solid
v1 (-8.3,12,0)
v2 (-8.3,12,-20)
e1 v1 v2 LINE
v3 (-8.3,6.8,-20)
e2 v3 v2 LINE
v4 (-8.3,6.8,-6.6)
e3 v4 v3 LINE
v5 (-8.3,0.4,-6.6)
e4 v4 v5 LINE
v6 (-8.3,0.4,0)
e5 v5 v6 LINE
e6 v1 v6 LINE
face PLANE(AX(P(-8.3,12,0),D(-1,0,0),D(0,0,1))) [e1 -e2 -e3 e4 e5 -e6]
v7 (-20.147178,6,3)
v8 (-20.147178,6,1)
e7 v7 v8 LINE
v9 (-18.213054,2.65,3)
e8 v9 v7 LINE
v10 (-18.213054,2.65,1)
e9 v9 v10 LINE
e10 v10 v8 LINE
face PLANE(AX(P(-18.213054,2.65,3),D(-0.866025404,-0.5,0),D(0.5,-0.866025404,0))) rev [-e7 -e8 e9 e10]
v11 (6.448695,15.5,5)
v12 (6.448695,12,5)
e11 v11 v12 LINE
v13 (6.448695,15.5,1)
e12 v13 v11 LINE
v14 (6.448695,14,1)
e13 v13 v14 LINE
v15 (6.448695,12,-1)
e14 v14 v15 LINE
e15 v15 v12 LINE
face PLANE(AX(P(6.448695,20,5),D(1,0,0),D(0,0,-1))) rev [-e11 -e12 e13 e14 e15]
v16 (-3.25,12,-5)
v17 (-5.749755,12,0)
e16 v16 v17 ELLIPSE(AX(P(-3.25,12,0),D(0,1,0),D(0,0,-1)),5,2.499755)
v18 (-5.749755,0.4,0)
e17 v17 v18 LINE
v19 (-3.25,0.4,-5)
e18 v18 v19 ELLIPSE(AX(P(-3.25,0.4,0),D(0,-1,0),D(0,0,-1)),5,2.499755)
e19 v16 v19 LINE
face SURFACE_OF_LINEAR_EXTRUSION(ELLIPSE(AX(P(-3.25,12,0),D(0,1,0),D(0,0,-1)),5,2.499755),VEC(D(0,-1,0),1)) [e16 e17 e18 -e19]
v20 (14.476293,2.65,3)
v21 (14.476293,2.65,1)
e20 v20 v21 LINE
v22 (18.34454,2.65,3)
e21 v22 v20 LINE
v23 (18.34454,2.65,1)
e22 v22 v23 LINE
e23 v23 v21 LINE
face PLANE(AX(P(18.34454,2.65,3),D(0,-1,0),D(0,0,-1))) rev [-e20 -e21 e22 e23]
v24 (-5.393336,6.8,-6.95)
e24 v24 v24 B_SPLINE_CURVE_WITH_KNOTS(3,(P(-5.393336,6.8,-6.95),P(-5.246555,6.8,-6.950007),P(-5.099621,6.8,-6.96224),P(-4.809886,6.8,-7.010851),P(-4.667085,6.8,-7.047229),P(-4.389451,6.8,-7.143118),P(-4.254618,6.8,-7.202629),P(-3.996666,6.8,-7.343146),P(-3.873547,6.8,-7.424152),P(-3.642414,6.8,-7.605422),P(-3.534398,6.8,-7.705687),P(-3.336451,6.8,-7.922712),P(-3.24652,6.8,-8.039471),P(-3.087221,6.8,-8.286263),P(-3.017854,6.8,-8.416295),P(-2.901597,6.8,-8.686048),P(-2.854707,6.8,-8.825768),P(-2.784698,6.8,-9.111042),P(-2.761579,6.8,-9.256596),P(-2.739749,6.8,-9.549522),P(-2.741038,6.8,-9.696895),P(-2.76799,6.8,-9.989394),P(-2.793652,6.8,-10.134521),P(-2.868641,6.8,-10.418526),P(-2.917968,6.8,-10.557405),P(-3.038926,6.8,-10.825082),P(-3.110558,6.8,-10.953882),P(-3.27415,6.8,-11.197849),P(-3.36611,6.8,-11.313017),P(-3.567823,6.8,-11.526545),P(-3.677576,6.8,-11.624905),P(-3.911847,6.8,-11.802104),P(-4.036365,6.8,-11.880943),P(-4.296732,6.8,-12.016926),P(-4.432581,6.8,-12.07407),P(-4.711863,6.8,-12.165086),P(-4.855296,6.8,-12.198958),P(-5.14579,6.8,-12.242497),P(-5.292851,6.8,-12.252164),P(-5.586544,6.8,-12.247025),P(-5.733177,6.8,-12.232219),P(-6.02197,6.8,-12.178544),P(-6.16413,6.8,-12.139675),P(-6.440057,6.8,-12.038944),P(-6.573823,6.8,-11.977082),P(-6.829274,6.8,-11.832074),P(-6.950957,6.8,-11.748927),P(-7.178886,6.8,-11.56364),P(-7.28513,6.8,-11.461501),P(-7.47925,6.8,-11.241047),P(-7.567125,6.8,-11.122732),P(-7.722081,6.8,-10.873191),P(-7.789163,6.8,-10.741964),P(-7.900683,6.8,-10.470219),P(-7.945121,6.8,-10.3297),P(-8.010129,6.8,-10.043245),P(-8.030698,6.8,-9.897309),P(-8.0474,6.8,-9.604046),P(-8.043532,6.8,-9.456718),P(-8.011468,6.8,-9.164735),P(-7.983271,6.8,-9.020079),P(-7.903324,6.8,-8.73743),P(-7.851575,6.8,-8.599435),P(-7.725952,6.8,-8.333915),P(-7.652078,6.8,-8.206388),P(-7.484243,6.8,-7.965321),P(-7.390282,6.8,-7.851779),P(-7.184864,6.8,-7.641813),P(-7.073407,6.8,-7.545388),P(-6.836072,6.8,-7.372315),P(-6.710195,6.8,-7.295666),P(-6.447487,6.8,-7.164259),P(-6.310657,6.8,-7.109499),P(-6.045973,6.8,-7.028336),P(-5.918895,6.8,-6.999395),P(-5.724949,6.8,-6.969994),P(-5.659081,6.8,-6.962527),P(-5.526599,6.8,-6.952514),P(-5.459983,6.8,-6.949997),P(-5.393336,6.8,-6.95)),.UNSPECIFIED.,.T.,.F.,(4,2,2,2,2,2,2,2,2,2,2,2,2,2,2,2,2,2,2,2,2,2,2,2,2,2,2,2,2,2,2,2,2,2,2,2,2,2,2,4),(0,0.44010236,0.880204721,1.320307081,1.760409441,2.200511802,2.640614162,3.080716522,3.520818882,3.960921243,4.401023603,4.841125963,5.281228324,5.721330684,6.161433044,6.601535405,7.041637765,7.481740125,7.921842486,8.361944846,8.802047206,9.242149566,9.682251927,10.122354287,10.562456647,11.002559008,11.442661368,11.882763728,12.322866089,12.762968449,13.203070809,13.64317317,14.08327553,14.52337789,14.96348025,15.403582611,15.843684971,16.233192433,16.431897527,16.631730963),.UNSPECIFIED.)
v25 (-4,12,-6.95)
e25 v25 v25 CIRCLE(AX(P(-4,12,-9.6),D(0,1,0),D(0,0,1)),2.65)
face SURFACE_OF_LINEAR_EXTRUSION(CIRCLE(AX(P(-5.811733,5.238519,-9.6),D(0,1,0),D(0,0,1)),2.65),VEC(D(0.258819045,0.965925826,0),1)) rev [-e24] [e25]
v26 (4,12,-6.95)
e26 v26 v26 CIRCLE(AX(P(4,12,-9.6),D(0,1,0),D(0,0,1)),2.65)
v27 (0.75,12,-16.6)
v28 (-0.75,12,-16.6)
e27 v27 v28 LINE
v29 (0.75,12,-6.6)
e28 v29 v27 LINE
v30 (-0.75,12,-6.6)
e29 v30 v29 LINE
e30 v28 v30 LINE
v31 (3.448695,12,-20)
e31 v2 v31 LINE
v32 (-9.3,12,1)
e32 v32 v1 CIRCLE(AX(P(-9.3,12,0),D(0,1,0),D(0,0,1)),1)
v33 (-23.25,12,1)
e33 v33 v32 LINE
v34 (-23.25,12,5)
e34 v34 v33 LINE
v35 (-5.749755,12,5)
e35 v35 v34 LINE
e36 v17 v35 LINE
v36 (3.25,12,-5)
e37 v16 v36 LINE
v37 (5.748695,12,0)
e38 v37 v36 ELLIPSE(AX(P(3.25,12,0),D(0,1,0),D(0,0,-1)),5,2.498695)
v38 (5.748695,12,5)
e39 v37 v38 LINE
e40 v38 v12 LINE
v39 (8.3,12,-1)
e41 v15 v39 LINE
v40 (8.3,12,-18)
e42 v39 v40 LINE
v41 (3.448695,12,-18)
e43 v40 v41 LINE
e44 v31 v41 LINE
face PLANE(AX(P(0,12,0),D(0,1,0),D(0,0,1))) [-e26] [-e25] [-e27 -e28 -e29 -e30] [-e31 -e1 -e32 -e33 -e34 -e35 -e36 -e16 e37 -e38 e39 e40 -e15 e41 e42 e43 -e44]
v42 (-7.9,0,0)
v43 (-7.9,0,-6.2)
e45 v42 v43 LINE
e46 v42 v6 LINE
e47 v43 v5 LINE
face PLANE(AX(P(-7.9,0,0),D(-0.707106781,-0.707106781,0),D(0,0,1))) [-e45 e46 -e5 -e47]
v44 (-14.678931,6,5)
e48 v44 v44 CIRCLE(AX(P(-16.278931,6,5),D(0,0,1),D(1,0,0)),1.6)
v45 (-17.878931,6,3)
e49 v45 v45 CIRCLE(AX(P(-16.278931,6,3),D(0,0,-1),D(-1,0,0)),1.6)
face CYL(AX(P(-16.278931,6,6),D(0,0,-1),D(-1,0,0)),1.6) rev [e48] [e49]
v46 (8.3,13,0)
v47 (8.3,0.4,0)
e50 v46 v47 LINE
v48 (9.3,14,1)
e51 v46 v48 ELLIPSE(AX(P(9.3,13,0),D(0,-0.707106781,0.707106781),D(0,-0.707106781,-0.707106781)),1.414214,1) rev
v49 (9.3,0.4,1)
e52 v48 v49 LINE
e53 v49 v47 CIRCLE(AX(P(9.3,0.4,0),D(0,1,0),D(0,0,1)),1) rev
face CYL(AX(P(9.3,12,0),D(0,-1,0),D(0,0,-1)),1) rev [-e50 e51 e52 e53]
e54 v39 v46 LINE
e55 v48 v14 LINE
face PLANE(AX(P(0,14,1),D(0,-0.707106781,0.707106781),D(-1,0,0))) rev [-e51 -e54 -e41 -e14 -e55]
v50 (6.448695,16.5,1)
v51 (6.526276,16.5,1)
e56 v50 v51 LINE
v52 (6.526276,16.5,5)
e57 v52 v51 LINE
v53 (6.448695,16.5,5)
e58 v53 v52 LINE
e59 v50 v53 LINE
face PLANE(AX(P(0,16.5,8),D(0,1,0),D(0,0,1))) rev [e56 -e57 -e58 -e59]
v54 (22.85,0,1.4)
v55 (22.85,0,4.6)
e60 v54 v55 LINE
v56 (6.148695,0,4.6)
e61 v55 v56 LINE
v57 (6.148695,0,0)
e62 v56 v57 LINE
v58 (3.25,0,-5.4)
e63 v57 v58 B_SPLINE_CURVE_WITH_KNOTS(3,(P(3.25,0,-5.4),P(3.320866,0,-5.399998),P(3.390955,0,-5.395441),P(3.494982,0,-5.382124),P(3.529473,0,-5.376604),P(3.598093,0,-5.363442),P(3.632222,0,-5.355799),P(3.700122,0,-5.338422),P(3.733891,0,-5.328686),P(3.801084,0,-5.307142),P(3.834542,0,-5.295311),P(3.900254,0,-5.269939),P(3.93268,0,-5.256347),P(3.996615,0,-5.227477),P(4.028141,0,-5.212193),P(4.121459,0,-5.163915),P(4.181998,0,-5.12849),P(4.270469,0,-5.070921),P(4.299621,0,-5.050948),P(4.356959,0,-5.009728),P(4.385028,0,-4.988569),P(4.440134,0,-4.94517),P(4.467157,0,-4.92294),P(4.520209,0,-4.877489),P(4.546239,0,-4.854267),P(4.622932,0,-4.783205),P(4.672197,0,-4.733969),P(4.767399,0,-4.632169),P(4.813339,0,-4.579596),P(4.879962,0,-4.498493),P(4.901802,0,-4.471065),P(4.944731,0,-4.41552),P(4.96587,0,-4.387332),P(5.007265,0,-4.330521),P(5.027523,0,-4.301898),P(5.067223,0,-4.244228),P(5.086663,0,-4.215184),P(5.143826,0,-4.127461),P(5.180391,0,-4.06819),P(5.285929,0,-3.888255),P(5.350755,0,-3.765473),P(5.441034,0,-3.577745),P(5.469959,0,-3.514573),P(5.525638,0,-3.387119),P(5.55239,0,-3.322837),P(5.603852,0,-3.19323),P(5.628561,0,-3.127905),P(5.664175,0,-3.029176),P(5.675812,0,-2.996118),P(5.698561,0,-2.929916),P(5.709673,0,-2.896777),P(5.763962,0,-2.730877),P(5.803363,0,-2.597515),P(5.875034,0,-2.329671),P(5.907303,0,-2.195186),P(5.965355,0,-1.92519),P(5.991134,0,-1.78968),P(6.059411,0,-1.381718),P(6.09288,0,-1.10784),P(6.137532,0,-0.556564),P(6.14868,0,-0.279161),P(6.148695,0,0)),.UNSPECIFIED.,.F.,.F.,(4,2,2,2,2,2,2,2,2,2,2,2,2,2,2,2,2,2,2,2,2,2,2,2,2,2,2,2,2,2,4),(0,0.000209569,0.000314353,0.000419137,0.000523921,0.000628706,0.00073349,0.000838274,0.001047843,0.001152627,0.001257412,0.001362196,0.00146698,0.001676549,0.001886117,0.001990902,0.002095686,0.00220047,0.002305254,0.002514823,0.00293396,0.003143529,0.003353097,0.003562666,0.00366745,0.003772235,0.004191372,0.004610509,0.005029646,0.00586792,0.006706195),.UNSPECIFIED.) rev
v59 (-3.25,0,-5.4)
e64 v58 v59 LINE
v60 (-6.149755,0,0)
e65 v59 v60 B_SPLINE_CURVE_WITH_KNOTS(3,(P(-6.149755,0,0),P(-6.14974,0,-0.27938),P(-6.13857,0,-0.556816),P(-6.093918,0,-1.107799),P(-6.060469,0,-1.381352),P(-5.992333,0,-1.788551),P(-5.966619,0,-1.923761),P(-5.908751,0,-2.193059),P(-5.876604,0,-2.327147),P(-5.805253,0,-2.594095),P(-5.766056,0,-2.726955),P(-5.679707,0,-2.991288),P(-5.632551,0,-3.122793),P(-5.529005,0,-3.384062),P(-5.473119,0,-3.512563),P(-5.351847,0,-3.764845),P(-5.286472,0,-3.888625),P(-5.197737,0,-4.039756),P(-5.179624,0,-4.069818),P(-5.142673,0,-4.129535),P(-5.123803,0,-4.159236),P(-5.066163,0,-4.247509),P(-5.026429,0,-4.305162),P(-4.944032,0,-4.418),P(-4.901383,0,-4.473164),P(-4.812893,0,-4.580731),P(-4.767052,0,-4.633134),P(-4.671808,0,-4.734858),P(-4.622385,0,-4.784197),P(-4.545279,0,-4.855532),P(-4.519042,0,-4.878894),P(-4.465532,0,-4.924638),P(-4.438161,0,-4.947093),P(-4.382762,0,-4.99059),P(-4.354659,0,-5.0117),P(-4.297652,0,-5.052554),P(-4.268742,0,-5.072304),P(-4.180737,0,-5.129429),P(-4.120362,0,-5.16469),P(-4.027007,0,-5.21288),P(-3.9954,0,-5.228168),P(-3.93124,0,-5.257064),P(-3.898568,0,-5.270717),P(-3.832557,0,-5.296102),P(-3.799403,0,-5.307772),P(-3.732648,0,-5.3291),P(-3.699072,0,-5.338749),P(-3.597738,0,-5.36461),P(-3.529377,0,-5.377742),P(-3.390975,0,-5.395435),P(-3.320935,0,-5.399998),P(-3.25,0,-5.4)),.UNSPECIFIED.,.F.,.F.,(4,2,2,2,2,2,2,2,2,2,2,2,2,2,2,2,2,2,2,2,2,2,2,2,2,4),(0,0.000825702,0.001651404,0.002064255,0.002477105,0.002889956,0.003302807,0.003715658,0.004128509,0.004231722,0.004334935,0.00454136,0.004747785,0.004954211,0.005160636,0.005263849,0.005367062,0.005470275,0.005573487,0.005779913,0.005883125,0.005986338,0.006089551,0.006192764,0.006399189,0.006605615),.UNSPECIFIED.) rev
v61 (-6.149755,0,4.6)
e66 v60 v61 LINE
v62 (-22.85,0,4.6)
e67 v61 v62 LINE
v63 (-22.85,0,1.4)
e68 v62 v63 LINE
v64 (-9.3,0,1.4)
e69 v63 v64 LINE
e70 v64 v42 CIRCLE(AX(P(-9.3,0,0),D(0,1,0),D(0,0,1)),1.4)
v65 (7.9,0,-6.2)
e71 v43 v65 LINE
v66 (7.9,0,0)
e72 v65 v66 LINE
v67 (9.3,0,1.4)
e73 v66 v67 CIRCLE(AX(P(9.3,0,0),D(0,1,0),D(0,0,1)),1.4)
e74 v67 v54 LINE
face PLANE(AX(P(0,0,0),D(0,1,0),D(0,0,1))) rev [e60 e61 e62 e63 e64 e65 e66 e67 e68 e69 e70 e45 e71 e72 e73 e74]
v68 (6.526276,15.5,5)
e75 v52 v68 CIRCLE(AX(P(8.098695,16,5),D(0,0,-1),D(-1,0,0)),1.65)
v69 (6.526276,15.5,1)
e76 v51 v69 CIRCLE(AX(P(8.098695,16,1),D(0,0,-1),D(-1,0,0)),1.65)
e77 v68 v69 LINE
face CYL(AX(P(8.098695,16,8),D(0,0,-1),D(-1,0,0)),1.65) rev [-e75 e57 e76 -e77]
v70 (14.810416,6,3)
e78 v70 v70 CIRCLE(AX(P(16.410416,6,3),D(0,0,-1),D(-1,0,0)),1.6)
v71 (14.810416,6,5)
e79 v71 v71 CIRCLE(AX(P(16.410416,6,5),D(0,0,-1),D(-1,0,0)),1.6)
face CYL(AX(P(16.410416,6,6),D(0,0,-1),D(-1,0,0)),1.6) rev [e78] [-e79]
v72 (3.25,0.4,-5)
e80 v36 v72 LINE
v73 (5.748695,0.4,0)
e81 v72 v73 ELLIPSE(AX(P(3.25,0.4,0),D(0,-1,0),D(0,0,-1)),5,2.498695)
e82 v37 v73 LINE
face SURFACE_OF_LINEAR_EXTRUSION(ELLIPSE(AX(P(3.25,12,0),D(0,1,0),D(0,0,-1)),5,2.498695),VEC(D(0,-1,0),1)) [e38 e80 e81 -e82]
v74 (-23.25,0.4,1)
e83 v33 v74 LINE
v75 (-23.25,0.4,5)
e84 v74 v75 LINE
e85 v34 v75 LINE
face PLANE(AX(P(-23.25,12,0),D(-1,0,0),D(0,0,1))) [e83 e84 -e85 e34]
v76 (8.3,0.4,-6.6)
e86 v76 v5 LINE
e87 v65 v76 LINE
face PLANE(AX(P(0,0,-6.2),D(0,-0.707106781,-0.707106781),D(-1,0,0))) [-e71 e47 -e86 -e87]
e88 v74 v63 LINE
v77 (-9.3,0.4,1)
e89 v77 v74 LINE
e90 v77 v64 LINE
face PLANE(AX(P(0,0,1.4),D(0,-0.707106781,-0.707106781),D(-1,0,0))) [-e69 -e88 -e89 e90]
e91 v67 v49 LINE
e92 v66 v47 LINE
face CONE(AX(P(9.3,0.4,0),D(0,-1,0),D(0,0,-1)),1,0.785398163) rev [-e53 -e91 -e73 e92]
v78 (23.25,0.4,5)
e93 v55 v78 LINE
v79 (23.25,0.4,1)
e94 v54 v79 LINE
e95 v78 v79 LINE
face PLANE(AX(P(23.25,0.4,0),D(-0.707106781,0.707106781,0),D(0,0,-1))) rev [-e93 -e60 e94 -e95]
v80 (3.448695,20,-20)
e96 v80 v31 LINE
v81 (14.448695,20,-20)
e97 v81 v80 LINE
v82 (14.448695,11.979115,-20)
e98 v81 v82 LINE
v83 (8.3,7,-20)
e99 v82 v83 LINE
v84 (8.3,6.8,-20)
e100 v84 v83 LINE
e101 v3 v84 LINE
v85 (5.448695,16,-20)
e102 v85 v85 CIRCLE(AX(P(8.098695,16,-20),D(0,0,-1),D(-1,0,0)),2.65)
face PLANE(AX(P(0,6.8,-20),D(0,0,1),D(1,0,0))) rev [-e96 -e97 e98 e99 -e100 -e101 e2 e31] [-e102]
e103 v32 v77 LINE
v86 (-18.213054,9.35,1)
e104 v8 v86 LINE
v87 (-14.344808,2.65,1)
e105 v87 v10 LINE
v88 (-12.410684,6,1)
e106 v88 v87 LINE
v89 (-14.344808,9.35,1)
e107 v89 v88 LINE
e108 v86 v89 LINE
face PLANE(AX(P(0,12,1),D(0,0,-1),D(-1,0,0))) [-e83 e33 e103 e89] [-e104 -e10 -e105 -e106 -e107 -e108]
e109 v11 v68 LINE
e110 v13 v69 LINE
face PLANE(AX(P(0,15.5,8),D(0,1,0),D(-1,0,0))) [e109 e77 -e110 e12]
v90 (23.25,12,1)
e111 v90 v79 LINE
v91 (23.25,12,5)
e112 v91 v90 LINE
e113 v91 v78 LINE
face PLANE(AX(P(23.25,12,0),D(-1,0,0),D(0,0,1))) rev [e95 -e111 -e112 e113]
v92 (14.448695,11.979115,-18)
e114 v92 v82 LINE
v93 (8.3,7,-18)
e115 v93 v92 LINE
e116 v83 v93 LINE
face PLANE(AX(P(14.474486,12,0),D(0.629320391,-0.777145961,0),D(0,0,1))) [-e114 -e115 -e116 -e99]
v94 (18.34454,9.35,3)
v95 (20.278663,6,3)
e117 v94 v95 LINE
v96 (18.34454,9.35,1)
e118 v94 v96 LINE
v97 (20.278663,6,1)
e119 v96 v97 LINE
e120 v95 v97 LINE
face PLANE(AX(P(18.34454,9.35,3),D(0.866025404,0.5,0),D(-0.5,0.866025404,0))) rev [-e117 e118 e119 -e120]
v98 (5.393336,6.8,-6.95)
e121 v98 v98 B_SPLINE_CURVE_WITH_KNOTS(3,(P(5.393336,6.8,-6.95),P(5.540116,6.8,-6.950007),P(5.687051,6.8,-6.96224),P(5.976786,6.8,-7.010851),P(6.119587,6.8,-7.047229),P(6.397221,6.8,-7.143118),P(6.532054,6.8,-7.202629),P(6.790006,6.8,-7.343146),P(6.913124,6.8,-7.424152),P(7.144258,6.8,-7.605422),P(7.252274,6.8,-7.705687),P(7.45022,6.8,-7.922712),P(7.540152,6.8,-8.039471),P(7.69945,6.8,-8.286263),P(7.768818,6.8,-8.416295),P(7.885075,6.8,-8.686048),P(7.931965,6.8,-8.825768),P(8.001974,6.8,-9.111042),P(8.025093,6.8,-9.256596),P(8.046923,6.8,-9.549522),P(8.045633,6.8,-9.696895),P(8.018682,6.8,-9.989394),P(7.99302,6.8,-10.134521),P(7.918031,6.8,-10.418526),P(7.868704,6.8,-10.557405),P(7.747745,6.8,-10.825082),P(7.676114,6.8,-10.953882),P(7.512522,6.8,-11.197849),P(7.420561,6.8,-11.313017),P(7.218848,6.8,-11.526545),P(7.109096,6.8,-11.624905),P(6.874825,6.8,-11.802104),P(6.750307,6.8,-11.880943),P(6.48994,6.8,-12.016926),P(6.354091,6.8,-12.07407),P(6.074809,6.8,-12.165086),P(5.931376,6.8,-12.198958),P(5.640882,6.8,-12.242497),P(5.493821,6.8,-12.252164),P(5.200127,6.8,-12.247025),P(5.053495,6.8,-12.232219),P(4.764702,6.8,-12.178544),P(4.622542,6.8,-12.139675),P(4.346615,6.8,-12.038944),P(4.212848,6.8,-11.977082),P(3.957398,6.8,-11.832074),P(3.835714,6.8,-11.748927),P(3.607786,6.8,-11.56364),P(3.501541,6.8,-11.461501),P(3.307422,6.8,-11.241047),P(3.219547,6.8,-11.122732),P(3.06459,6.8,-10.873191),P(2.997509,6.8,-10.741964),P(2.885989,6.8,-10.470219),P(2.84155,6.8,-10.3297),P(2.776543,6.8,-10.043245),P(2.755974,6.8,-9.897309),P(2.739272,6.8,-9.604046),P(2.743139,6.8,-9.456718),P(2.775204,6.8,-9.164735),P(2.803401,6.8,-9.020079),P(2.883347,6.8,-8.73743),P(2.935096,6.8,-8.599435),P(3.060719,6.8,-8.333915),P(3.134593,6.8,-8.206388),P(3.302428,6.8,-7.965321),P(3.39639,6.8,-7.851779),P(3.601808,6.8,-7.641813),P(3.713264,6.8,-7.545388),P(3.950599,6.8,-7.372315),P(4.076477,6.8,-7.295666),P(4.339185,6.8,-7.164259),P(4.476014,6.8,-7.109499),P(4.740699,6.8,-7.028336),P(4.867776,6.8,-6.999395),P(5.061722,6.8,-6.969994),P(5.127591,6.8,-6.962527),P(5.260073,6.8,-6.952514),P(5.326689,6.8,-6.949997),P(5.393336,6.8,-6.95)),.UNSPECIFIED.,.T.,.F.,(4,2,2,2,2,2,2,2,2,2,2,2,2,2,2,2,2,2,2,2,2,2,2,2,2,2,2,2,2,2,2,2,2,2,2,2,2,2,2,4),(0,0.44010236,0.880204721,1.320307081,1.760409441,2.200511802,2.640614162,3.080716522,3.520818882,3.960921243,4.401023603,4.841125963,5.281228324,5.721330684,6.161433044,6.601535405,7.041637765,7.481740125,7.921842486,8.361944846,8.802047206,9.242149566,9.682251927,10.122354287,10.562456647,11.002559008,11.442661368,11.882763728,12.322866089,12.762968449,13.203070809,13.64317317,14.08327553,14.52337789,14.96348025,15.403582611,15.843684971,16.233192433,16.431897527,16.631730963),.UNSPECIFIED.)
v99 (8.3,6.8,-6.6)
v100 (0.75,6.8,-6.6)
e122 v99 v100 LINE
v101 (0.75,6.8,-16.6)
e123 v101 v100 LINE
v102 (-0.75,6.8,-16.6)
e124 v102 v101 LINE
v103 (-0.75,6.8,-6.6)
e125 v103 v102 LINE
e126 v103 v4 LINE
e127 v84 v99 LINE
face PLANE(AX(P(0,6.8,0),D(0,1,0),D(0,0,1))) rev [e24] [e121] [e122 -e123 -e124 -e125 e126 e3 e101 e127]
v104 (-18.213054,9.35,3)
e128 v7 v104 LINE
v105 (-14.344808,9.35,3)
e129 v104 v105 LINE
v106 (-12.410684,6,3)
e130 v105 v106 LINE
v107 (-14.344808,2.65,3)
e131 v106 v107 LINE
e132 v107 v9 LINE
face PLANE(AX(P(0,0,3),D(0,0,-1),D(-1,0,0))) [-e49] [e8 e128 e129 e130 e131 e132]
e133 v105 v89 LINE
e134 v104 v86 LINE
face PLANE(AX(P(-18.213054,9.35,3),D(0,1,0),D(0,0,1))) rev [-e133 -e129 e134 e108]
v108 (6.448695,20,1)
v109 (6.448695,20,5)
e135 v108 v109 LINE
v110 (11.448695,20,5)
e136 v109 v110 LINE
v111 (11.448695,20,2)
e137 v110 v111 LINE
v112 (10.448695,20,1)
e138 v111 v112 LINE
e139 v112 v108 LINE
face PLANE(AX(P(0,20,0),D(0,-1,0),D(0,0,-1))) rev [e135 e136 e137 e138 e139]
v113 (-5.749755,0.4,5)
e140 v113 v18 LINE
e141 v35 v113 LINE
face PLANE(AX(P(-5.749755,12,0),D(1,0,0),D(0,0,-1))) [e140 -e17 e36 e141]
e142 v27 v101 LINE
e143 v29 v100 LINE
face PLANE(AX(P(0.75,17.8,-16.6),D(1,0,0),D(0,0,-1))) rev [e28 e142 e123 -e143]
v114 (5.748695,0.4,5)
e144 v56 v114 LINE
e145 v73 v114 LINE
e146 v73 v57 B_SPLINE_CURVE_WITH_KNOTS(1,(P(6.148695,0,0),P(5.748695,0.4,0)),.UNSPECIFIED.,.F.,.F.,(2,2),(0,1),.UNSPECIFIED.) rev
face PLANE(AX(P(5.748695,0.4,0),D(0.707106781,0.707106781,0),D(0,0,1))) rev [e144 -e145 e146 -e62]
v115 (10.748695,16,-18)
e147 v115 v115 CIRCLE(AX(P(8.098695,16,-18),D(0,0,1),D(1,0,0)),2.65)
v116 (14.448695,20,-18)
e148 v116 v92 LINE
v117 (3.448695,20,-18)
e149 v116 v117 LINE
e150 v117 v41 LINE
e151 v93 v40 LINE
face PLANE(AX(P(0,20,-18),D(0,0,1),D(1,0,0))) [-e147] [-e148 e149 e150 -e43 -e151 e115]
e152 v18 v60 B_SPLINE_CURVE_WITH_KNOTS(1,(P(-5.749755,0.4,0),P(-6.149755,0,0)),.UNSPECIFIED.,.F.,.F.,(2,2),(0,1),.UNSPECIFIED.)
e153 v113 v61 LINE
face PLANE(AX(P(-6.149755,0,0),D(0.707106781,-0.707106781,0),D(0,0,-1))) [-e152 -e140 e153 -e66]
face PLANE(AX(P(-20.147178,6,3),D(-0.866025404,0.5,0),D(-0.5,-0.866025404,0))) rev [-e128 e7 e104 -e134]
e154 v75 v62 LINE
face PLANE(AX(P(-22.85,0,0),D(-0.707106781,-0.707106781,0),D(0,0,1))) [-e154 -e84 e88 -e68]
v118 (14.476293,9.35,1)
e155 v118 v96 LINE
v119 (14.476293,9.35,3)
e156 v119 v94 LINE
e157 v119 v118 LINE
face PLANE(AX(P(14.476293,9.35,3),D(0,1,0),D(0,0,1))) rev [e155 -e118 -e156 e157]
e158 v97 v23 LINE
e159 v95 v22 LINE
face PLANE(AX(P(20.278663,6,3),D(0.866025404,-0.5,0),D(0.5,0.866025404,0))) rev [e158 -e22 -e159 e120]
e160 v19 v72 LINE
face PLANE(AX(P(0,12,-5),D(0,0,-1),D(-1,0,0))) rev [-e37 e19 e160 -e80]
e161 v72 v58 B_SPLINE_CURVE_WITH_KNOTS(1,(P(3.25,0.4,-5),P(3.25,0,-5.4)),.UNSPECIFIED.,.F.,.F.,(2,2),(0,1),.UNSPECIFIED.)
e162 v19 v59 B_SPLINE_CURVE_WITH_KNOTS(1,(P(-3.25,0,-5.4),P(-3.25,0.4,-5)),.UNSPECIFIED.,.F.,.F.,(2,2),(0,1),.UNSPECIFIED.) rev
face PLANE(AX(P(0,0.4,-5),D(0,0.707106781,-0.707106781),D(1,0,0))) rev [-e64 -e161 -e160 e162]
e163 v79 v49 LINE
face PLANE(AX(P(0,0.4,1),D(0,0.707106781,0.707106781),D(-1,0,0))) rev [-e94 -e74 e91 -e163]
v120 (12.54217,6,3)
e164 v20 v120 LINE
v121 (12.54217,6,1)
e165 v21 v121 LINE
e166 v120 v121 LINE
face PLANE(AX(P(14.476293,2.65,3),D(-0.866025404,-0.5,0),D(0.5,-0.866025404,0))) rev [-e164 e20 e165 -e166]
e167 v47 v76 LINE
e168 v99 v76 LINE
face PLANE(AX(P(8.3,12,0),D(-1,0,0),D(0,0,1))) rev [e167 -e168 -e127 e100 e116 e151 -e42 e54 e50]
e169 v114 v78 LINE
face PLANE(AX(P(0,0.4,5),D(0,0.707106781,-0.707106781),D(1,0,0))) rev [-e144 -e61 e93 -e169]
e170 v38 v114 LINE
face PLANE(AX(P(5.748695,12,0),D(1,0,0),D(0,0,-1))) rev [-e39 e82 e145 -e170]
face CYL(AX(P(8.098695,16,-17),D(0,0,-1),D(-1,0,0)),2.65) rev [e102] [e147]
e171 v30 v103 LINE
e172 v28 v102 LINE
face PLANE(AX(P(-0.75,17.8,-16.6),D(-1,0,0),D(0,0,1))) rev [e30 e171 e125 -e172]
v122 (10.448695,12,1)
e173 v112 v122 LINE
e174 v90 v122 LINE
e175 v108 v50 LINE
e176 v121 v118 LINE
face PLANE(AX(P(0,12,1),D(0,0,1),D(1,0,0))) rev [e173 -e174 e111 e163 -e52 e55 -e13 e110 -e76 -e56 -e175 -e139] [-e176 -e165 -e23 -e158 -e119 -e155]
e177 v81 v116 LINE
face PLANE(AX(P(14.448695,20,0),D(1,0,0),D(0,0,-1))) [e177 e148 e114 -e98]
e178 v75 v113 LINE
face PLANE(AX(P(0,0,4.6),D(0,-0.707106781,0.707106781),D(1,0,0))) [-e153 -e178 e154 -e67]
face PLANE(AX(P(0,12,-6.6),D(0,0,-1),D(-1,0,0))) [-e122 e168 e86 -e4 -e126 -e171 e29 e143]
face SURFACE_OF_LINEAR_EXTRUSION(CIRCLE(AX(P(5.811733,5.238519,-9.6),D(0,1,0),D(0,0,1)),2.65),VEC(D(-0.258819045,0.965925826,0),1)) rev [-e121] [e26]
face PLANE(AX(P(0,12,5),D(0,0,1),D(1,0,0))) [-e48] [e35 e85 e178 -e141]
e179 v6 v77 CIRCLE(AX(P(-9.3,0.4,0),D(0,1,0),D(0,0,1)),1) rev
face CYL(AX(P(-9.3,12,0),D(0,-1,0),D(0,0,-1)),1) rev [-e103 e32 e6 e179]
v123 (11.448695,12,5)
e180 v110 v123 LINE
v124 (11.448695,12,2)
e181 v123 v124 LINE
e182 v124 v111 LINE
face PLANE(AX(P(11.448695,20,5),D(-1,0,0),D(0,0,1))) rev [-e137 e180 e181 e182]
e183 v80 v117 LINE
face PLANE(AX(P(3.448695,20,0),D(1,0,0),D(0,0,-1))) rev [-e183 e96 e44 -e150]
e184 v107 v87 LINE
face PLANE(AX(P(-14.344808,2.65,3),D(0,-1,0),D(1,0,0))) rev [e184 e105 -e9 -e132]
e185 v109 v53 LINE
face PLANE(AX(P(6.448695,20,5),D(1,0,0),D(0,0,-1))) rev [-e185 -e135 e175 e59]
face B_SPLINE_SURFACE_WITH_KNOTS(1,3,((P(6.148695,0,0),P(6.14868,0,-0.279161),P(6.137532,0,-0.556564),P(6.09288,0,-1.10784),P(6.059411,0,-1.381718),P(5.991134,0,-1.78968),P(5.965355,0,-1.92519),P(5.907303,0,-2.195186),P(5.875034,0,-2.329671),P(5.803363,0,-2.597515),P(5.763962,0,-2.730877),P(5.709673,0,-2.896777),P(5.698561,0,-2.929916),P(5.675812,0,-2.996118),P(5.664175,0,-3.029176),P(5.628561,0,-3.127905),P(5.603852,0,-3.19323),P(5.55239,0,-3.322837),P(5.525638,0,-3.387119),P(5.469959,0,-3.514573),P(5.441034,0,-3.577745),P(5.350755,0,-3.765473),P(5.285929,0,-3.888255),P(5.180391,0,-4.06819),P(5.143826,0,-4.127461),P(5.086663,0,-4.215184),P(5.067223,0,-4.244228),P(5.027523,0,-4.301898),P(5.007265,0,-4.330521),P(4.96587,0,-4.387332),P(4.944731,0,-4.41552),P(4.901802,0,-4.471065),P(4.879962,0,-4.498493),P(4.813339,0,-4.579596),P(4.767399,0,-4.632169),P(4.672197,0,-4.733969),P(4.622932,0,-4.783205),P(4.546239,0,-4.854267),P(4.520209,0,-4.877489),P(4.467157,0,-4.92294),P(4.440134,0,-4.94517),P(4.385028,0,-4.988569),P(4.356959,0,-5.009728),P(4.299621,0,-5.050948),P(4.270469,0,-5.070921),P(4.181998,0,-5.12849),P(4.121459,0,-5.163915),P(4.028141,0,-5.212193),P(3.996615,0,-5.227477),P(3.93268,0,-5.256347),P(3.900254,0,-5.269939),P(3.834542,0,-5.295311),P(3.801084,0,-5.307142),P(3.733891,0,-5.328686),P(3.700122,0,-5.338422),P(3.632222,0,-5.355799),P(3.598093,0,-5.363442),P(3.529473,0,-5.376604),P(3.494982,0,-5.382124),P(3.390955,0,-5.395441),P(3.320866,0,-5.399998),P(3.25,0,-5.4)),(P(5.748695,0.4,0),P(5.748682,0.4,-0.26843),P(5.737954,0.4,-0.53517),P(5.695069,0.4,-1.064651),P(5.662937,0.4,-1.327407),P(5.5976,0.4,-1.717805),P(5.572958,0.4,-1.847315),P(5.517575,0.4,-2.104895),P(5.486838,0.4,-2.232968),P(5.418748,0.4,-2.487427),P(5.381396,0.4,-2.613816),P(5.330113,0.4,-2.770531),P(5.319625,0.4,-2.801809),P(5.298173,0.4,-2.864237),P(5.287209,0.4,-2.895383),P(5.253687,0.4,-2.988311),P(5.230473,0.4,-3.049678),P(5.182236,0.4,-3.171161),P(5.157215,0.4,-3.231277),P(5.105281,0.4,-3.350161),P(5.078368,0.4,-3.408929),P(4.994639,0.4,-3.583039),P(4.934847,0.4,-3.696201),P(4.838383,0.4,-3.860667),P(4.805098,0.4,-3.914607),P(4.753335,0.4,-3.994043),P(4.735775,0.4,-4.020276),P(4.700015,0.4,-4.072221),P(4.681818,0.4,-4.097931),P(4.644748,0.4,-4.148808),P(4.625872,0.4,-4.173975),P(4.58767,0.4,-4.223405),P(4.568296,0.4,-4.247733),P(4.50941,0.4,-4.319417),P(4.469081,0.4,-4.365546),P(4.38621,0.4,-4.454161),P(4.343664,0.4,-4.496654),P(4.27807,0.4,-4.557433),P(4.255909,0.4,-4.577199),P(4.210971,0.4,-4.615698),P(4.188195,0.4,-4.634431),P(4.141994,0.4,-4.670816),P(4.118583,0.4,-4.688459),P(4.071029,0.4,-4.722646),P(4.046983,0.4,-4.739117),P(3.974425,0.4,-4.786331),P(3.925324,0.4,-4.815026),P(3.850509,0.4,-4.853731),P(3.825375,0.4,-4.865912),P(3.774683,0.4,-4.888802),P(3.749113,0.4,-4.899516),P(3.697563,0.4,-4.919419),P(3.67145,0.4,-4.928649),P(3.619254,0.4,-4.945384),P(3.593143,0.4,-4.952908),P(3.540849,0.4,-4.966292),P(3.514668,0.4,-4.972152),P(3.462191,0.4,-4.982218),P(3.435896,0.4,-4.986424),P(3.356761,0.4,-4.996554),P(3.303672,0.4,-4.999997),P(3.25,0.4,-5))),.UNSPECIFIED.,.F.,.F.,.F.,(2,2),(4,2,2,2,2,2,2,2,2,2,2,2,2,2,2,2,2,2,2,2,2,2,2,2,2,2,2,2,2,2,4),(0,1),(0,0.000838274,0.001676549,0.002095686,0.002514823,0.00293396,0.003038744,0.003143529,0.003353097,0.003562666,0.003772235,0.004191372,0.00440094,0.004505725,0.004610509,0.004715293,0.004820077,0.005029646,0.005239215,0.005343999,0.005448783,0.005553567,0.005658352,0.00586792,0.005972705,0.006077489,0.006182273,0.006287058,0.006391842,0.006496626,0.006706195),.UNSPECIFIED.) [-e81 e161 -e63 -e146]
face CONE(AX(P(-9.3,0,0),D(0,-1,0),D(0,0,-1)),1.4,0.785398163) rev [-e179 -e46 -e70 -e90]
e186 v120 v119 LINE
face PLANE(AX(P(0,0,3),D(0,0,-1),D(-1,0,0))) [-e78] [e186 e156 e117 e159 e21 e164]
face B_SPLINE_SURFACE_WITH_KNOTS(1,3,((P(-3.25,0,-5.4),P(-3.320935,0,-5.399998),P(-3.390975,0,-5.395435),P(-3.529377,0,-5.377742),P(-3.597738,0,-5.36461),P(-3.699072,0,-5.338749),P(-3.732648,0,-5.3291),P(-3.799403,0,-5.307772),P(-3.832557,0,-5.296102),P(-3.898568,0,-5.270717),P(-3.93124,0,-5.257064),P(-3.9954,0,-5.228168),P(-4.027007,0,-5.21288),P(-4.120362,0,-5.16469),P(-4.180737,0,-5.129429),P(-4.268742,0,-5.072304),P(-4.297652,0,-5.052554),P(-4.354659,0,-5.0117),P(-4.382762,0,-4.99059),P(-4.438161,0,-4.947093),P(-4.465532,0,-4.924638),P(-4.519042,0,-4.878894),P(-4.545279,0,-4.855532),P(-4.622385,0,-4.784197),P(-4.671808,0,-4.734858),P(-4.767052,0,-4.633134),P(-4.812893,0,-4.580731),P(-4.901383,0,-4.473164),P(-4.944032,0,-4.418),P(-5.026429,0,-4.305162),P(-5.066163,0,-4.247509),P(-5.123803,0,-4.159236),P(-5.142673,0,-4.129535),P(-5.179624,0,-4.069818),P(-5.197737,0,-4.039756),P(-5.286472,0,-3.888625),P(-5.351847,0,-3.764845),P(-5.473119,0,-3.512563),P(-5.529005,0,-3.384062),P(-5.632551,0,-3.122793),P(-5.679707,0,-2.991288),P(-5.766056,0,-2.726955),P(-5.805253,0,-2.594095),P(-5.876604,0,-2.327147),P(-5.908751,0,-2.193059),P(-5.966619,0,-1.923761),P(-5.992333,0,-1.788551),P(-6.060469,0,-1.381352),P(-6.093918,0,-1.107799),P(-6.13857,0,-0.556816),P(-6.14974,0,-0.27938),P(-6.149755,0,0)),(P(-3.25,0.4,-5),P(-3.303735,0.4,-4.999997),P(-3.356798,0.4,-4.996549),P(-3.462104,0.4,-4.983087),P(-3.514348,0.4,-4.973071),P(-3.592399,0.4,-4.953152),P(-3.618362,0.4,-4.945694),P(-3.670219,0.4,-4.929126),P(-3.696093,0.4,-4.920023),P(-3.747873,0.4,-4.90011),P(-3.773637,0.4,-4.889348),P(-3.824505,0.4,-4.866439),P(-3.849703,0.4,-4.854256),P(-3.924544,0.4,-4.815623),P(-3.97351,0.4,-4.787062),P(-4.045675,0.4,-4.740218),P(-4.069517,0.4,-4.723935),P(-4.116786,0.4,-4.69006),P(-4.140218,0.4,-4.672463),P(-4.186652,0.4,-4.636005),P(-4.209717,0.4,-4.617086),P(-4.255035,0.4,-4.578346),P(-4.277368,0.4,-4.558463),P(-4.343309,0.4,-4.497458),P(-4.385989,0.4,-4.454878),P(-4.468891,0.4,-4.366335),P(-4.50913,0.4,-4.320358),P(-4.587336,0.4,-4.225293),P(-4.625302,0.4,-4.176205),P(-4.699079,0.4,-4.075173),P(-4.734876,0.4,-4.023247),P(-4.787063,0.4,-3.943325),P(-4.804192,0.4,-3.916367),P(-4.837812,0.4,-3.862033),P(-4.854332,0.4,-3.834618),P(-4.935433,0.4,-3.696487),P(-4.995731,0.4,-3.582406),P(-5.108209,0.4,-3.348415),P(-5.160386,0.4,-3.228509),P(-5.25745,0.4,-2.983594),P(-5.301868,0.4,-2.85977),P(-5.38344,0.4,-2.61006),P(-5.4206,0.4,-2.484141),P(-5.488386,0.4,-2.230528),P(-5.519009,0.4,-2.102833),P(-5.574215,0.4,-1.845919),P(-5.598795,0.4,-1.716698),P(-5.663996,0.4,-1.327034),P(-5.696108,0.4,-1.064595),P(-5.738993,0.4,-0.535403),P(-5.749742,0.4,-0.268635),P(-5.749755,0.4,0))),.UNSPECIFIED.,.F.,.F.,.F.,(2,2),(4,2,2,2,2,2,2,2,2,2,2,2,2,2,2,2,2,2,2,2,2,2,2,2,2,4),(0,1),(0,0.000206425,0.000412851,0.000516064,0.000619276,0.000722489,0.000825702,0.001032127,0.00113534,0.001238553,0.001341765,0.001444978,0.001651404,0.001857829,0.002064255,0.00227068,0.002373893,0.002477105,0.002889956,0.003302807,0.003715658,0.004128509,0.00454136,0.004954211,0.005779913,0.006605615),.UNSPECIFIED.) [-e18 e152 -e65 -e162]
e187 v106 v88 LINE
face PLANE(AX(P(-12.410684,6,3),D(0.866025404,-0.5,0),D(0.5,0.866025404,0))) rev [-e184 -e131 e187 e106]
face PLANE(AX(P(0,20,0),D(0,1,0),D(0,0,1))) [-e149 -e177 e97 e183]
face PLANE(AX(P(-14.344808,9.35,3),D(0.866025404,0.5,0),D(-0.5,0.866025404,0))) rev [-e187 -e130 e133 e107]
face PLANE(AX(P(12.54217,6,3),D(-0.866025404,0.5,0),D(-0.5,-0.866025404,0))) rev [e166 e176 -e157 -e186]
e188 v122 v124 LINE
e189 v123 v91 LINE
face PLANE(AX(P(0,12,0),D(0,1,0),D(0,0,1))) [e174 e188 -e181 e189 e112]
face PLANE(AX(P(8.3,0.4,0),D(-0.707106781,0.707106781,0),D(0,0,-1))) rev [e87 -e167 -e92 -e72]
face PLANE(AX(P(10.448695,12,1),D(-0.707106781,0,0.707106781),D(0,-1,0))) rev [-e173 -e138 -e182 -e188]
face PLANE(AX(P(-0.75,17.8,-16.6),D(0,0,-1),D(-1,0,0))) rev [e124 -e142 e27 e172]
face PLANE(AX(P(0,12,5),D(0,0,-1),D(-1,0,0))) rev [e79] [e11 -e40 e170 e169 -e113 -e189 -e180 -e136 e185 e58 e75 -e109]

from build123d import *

# Parameters (mm, degrees)
BOSS_EXTRUDE1_DEPTH = 12
CUT_EXTRUDE1_DEPTH  = 2
SKETCH3_W           = 16.6
SKETCH3_H           = 13.4
BOSS_EXTRUDE2_DEPTH = 5.2
SKETCH5_R           = 1.6
CUT_EXTRUDE2_DEPTH  = 5
SKETCH6_W           = 5
SKETCH6_H           = 4
BOSS_EXTRUDE4_DEPTH = 8
CUT_EXTRUDE4_DEPTH  = 7
SKETCH8_R           = 2.65
CUT_EXTRUDE5_DEPTH  = 7
SKETCH10_R          = 2.65
CUT_EXTRUDE6_DEPTH  = 7
CHAMFER2_SIZE       = 2
CHAMFER3_SIZE       = 1
SKETCH12_W          = 3
SKETCH12_H          = 2
SKETCH12_W_2        = 6.148694825
SKETCH12_W_3        = 1.851305175
BOSS_EXTRUDE5_DEPTH = 8
SKETCH13_R          = 2.65
CUT_EXTRUDE7_DEPTH  = 3
CHAMFER4_SIZE       = 5
CHAMFER4_SIZE_2     = 6.174485783
SKETCH16_W          = 1.5
SKETCH16_H          = 10
CUT_EXTRUDE8_DEPTH  = 11
CHAMFER5_SIZE       = 0.4


with BuildPart() as part:
    # Sketch1 → Boss-Extrude1 (new body)
    with BuildSketch(Plane(origin=(0, 0, 0), x_dir=(1, 0, 0), z_dir=(0, 1, 0))):
        with BuildLine():
            Line((-23.25, -5), (-5.749755012, -5))
            Line((-5.749755012, -5), (-5.749755012, 0))
            add(Edge.make_bspline(
                [(-3.25, 5), (-5.749755012, 5), (-5.749755012, 0)],
                knots=[0, 0, 0, 1.570796327, 1.570796327, 1.570796327], degree=2, weights=[1, 0.707106781, 1]))
            Line((-3.25, 5), (3.25, 5))
            add(Edge.make_bspline(
                [(5.748694825, 0), (5.748694825, 5), (3.25, 5)],
                knots=[4.71238898, 4.71238898, 4.71238898, 6.283185307, 6.283185307, 6.283185307], degree=2, weights=[1, 0.707106781, 1]))
            Line((5.748694825, 0), (5.748694825, -5))
            Line((5.748694825, -5), (23.25, -5))
            Line((23.25, -5), (23.25, -3))
            Line((23.25, -3), (23.25, -1))
            Line((23.25, -1), (9.3, -1))
            ThreePointArc((9.3, -1), (8.592893219, -0.707106781), (8.3, 0))
            Line((8.3, 0), (8.3, 6.6))
            Line((8.3, 6.6), (-8.3, 6.6))
            Line((-8.3, 6.6), (-8.3, 0))
            ThreePointArc((-8.3, 0), (-8.592893219, -0.707106781), (-9.3, -1))
            Line((-9.3, -1), (-23.25, -1))
            Line((-23.25, -1), (-23.25, -5))
        make_face()
    extrude(amount=BOSS_EXTRUDE1_DEPTH)

    # Sketch2 → Cut-Extrude1 (cut)
    with BuildSketch(Plane(origin=(0, 0, 1), x_dir=(-1, 0, 0), z_dir=(0, 0, -1))):
        Polygon((20.147177825, 6), (18.213054423, 9.35), (14.344807619, 9.35), (12.410684218, 6), (14.344807619, 2.65), (18.213054423, 2.65), align=None)
        Polygon((-12.542169585, 6), (-14.476292987, 9.35), (-18.34453979, 9.35), (-20.278663192, 6), (-18.34453979, 2.65), (-14.476292987, 2.65), align=None)
    extrude(amount=-CUT_EXTRUDE1_DEPTH, mode=Mode.SUBTRACT)

    # Sketch3 → Boss-Extrude2 (add)
    with BuildSketch(Plane(origin=(0, 12, 0), x_dir=(1, 0, 0), z_dir=(0, 1, 0))):
        with Locations((0, 13.3)):
            Rectangle(SKETCH3_W, SKETCH3_H)
    extrude(amount=-BOSS_EXTRUDE2_DEPTH)

    # Sketch5 → Cut-Extrude2 (cut)
    with BuildSketch(Plane(origin=(0, 0, 1), x_dir=(-1, 0, 0), z_dir=(0, 0, -1))):
        with Locations((-16.410416388, 6)):
            Circle(SKETCH5_R)
        with Locations((16.278931021, 6)):
            Circle(SKETCH5_R)
    extrude(amount=-CUT_EXTRUDE2_DEPTH, mode=Mode.SUBTRACT)

    # Sketch6 → Boss-Extrude4 (add)
    with BuildSketch(Plane(origin=(0, 12, 0), x_dir=(1, 0, 0), z_dir=(0, 1, 0))):
        with Locations((8.948694825, -3)):
            Rectangle(SKETCH6_W, SKETCH6_H)
    extrude(amount=BOSS_EXTRUDE4_DEPTH)

    # Sketch7 → Cut-Extrude4 (cut)
    with BuildSketch(Plane(origin=(0, 0, 1), x_dir=(-1, 0, 0), z_dir=(0, 0, -1))):
        with BuildLine():
            ThreePointArc((-6.448694825, 16), (-6.468205549, 16.252991544), (-6.526276305, 16.5))
            Line((-6.526276305, 16.5), (-7.999397269, 16.5))
            Line((-7.999397269, 16.5), (-7.999397269, 15.5))
            Line((-7.999397269, 15.5), (-6.526276305, 15.5))
            ThreePointArc((-6.526276305, 15.5), (-6.468205549, 15.747008456), (-6.448694825, 16))
        make_face()
        with BuildLine():
            Line((-7.999397269, 16.5), (-6.526276305, 16.5))
            ThreePointArc((-6.526276305, 16.5), (-9.748694825, 16), (-6.526276305, 15.5))
            Line((-6.526276305, 15.5), (-7.999397269, 15.5))
            Line((-7.999397269, 15.5), (-7.999397269, 16.5))
        make_face()
        with BuildLine():
            Line((-6.448694825, 15.5), (-6.448694825, 16))
            ThreePointArc((-6.448694825, 16), (-6.468205549, 15.747008456), (-6.526276305, 15.5))
            Line((-6.526276305, 15.5), (-6.448694825, 15.5))
        make_face()
        with BuildLine():
            Line((-6.448694825, 16), (-6.448694825, 16.5))
            Line((-6.448694825, 16.5), (-6.526276305, 16.5))
            ThreePointArc((-6.526276305, 16.5), (-6.468205549, 16.252991544), (-6.448694825, 16))
        make_face()
    extrude(amount=-CUT_EXTRUDE4_DEPTH, mode=Mode.SUBTRACT)

    # Sketch8 → Cut-Extrude5 (cut, along a direction that is not the sketch's normal)
    with BuildSketch(Plane(origin=(0, 12, 0), x_dir=(1, 0, 0), z_dir=(0, 1, 0))):
        with Locations((-4, 9.6)):
            Circle(SKETCH8_R)
    extrude(amount=-CUT_EXTRUDE5_DEPTH, dir=(0.2588190451025147, 0.96592582628907, -1.457918124587514e-13), mode=Mode.SUBTRACT)

    # Sketch10 → Cut-Extrude6 (cut, along a direction that is not the sketch's normal)
    with BuildSketch(Plane(origin=(0, 12, 0), x_dir=(1, 0, 0), z_dir=(0, 1, 0))):
        with Locations((4, 9.6)):
            Circle(SKETCH10_R)
    extrude(amount=-CUT_EXTRUDE6_DEPTH, dir=(-0.25881904510251447, 0.96592582628907, 0), mode=Mode.SUBTRACT)

    # Chamfer2
    chamfer2_edges = [part.edges().sort_by_distance(p)[0] for p in [
        (7.874347412, 12, 1),
    ]]
    chamfer(chamfer2_edges, length=CHAMFER2_SIZE)

    # Chamfer3
    chamfer3_edges = [part.edges().sort_by_distance(p)[0] for p in [
        (11.448694825, 16, 1),
    ]]
    chamfer(chamfer3_edges, length=CHAMFER3_SIZE)

    # Sketch12 → Boss-Extrude5 (add)
    with BuildSketch(Plane(origin=(0, 12, 0), x_dir=(1, 0, 0), z_dir=(0, 1, 0))):
        with Locations((4.948694825, 19)):
            Rectangle(SKETCH12_W, SKETCH12_H)
        with Locations((11.374347413, 19)):
            Rectangle(SKETCH12_W_2, SKETCH12_H)
        with Locations((7.374347413, 19)):
            Rectangle(SKETCH12_W_3, SKETCH12_H)
    extrude(amount=BOSS_EXTRUDE5_DEPTH)

    # Sketch13 → Cut-Extrude7 (cut)
    with BuildSketch(Plane(origin=(0, 0, -20), x_dir=(-1, 0, 0), z_dir=(0, 0, -1))):
        with Locations((-8.098694825, 16)):
            Circle(SKETCH13_R)
    extrude(amount=-CUT_EXTRUDE7_DEPTH, mode=Mode.SUBTRACT)

    # Chamfer4
    # the kernel refuses this chamfer: 6.174485783, 5 mm, written as the material it adds along each edge
    with BuildSketch(Plane(origin=(8.3, 12, -18), x_dir=(-0.037204697112204525, -0.9993076655929289, 0), z_dir=(0, 0, -1))) as chamfer4_piece_1_section:
        Polygon((CHAMFER4_SIZE * 0.999307665593, -CHAMFER4_SIZE * 0.0372046971122), (-CHAMFER4_SIZE_2 * 0.0372046971102, -CHAMFER4_SIZE_2 * 0.99930766554), (0, 0), align=None)
    chamfer4_piece_1 = extrude(amount=2, mode=Mode.PRIVATE)
    chamfer4_piece_1 = split(chamfer4_piece_1, bisect_by=Plane(origin=(14.448694825, 10.333304375, -19), z_dir=(-1, 0, 0)), keep=Keep.TOP, mode=Mode.PRIVATE)
    add(chamfer4_piece_1)

    # Sketch16 → Cut-Extrude8 (cut)
    with BuildSketch(Plane.XZ.offset(-6.8)):
        with Locations((0, -11.6)):
            Rectangle(SKETCH16_W, SKETCH16_H)
    extrude(amount=-CUT_EXTRUDE8_DEPTH, mode=Mode.SUBTRACT)

    # Chamfer5
    chamfer5_edges = [part.edges().sort_by_distance(p)[0] for p in [
        (0, 0, -5),
        (-5.260112096, 0, -2.972310439),
        (-5.749755012, 0, 2.5),
        (-14.499877506, 0, 5),
        (-23.25, 0, 3),
        (-16.275, 0, 1),
        (-8.592893219, 0, 0.707106781),
        (-8.3, 0, -3.3),
        (0, 0, -6.6),
        (8.3, 0, -3.3),
        (8.592893219, 0, 0.707106781),
        (16.275, 0, 1),
        (23.25, 0, 3),
        (14.499347412, 0, 5),
        (5.748694825, 0, 2.5),
        (5.259369228, 0, -2.972013605),
    ]]
    chamfer(chamfer5_edges, length=CHAMFER5_SIZE)


solid = part.part
